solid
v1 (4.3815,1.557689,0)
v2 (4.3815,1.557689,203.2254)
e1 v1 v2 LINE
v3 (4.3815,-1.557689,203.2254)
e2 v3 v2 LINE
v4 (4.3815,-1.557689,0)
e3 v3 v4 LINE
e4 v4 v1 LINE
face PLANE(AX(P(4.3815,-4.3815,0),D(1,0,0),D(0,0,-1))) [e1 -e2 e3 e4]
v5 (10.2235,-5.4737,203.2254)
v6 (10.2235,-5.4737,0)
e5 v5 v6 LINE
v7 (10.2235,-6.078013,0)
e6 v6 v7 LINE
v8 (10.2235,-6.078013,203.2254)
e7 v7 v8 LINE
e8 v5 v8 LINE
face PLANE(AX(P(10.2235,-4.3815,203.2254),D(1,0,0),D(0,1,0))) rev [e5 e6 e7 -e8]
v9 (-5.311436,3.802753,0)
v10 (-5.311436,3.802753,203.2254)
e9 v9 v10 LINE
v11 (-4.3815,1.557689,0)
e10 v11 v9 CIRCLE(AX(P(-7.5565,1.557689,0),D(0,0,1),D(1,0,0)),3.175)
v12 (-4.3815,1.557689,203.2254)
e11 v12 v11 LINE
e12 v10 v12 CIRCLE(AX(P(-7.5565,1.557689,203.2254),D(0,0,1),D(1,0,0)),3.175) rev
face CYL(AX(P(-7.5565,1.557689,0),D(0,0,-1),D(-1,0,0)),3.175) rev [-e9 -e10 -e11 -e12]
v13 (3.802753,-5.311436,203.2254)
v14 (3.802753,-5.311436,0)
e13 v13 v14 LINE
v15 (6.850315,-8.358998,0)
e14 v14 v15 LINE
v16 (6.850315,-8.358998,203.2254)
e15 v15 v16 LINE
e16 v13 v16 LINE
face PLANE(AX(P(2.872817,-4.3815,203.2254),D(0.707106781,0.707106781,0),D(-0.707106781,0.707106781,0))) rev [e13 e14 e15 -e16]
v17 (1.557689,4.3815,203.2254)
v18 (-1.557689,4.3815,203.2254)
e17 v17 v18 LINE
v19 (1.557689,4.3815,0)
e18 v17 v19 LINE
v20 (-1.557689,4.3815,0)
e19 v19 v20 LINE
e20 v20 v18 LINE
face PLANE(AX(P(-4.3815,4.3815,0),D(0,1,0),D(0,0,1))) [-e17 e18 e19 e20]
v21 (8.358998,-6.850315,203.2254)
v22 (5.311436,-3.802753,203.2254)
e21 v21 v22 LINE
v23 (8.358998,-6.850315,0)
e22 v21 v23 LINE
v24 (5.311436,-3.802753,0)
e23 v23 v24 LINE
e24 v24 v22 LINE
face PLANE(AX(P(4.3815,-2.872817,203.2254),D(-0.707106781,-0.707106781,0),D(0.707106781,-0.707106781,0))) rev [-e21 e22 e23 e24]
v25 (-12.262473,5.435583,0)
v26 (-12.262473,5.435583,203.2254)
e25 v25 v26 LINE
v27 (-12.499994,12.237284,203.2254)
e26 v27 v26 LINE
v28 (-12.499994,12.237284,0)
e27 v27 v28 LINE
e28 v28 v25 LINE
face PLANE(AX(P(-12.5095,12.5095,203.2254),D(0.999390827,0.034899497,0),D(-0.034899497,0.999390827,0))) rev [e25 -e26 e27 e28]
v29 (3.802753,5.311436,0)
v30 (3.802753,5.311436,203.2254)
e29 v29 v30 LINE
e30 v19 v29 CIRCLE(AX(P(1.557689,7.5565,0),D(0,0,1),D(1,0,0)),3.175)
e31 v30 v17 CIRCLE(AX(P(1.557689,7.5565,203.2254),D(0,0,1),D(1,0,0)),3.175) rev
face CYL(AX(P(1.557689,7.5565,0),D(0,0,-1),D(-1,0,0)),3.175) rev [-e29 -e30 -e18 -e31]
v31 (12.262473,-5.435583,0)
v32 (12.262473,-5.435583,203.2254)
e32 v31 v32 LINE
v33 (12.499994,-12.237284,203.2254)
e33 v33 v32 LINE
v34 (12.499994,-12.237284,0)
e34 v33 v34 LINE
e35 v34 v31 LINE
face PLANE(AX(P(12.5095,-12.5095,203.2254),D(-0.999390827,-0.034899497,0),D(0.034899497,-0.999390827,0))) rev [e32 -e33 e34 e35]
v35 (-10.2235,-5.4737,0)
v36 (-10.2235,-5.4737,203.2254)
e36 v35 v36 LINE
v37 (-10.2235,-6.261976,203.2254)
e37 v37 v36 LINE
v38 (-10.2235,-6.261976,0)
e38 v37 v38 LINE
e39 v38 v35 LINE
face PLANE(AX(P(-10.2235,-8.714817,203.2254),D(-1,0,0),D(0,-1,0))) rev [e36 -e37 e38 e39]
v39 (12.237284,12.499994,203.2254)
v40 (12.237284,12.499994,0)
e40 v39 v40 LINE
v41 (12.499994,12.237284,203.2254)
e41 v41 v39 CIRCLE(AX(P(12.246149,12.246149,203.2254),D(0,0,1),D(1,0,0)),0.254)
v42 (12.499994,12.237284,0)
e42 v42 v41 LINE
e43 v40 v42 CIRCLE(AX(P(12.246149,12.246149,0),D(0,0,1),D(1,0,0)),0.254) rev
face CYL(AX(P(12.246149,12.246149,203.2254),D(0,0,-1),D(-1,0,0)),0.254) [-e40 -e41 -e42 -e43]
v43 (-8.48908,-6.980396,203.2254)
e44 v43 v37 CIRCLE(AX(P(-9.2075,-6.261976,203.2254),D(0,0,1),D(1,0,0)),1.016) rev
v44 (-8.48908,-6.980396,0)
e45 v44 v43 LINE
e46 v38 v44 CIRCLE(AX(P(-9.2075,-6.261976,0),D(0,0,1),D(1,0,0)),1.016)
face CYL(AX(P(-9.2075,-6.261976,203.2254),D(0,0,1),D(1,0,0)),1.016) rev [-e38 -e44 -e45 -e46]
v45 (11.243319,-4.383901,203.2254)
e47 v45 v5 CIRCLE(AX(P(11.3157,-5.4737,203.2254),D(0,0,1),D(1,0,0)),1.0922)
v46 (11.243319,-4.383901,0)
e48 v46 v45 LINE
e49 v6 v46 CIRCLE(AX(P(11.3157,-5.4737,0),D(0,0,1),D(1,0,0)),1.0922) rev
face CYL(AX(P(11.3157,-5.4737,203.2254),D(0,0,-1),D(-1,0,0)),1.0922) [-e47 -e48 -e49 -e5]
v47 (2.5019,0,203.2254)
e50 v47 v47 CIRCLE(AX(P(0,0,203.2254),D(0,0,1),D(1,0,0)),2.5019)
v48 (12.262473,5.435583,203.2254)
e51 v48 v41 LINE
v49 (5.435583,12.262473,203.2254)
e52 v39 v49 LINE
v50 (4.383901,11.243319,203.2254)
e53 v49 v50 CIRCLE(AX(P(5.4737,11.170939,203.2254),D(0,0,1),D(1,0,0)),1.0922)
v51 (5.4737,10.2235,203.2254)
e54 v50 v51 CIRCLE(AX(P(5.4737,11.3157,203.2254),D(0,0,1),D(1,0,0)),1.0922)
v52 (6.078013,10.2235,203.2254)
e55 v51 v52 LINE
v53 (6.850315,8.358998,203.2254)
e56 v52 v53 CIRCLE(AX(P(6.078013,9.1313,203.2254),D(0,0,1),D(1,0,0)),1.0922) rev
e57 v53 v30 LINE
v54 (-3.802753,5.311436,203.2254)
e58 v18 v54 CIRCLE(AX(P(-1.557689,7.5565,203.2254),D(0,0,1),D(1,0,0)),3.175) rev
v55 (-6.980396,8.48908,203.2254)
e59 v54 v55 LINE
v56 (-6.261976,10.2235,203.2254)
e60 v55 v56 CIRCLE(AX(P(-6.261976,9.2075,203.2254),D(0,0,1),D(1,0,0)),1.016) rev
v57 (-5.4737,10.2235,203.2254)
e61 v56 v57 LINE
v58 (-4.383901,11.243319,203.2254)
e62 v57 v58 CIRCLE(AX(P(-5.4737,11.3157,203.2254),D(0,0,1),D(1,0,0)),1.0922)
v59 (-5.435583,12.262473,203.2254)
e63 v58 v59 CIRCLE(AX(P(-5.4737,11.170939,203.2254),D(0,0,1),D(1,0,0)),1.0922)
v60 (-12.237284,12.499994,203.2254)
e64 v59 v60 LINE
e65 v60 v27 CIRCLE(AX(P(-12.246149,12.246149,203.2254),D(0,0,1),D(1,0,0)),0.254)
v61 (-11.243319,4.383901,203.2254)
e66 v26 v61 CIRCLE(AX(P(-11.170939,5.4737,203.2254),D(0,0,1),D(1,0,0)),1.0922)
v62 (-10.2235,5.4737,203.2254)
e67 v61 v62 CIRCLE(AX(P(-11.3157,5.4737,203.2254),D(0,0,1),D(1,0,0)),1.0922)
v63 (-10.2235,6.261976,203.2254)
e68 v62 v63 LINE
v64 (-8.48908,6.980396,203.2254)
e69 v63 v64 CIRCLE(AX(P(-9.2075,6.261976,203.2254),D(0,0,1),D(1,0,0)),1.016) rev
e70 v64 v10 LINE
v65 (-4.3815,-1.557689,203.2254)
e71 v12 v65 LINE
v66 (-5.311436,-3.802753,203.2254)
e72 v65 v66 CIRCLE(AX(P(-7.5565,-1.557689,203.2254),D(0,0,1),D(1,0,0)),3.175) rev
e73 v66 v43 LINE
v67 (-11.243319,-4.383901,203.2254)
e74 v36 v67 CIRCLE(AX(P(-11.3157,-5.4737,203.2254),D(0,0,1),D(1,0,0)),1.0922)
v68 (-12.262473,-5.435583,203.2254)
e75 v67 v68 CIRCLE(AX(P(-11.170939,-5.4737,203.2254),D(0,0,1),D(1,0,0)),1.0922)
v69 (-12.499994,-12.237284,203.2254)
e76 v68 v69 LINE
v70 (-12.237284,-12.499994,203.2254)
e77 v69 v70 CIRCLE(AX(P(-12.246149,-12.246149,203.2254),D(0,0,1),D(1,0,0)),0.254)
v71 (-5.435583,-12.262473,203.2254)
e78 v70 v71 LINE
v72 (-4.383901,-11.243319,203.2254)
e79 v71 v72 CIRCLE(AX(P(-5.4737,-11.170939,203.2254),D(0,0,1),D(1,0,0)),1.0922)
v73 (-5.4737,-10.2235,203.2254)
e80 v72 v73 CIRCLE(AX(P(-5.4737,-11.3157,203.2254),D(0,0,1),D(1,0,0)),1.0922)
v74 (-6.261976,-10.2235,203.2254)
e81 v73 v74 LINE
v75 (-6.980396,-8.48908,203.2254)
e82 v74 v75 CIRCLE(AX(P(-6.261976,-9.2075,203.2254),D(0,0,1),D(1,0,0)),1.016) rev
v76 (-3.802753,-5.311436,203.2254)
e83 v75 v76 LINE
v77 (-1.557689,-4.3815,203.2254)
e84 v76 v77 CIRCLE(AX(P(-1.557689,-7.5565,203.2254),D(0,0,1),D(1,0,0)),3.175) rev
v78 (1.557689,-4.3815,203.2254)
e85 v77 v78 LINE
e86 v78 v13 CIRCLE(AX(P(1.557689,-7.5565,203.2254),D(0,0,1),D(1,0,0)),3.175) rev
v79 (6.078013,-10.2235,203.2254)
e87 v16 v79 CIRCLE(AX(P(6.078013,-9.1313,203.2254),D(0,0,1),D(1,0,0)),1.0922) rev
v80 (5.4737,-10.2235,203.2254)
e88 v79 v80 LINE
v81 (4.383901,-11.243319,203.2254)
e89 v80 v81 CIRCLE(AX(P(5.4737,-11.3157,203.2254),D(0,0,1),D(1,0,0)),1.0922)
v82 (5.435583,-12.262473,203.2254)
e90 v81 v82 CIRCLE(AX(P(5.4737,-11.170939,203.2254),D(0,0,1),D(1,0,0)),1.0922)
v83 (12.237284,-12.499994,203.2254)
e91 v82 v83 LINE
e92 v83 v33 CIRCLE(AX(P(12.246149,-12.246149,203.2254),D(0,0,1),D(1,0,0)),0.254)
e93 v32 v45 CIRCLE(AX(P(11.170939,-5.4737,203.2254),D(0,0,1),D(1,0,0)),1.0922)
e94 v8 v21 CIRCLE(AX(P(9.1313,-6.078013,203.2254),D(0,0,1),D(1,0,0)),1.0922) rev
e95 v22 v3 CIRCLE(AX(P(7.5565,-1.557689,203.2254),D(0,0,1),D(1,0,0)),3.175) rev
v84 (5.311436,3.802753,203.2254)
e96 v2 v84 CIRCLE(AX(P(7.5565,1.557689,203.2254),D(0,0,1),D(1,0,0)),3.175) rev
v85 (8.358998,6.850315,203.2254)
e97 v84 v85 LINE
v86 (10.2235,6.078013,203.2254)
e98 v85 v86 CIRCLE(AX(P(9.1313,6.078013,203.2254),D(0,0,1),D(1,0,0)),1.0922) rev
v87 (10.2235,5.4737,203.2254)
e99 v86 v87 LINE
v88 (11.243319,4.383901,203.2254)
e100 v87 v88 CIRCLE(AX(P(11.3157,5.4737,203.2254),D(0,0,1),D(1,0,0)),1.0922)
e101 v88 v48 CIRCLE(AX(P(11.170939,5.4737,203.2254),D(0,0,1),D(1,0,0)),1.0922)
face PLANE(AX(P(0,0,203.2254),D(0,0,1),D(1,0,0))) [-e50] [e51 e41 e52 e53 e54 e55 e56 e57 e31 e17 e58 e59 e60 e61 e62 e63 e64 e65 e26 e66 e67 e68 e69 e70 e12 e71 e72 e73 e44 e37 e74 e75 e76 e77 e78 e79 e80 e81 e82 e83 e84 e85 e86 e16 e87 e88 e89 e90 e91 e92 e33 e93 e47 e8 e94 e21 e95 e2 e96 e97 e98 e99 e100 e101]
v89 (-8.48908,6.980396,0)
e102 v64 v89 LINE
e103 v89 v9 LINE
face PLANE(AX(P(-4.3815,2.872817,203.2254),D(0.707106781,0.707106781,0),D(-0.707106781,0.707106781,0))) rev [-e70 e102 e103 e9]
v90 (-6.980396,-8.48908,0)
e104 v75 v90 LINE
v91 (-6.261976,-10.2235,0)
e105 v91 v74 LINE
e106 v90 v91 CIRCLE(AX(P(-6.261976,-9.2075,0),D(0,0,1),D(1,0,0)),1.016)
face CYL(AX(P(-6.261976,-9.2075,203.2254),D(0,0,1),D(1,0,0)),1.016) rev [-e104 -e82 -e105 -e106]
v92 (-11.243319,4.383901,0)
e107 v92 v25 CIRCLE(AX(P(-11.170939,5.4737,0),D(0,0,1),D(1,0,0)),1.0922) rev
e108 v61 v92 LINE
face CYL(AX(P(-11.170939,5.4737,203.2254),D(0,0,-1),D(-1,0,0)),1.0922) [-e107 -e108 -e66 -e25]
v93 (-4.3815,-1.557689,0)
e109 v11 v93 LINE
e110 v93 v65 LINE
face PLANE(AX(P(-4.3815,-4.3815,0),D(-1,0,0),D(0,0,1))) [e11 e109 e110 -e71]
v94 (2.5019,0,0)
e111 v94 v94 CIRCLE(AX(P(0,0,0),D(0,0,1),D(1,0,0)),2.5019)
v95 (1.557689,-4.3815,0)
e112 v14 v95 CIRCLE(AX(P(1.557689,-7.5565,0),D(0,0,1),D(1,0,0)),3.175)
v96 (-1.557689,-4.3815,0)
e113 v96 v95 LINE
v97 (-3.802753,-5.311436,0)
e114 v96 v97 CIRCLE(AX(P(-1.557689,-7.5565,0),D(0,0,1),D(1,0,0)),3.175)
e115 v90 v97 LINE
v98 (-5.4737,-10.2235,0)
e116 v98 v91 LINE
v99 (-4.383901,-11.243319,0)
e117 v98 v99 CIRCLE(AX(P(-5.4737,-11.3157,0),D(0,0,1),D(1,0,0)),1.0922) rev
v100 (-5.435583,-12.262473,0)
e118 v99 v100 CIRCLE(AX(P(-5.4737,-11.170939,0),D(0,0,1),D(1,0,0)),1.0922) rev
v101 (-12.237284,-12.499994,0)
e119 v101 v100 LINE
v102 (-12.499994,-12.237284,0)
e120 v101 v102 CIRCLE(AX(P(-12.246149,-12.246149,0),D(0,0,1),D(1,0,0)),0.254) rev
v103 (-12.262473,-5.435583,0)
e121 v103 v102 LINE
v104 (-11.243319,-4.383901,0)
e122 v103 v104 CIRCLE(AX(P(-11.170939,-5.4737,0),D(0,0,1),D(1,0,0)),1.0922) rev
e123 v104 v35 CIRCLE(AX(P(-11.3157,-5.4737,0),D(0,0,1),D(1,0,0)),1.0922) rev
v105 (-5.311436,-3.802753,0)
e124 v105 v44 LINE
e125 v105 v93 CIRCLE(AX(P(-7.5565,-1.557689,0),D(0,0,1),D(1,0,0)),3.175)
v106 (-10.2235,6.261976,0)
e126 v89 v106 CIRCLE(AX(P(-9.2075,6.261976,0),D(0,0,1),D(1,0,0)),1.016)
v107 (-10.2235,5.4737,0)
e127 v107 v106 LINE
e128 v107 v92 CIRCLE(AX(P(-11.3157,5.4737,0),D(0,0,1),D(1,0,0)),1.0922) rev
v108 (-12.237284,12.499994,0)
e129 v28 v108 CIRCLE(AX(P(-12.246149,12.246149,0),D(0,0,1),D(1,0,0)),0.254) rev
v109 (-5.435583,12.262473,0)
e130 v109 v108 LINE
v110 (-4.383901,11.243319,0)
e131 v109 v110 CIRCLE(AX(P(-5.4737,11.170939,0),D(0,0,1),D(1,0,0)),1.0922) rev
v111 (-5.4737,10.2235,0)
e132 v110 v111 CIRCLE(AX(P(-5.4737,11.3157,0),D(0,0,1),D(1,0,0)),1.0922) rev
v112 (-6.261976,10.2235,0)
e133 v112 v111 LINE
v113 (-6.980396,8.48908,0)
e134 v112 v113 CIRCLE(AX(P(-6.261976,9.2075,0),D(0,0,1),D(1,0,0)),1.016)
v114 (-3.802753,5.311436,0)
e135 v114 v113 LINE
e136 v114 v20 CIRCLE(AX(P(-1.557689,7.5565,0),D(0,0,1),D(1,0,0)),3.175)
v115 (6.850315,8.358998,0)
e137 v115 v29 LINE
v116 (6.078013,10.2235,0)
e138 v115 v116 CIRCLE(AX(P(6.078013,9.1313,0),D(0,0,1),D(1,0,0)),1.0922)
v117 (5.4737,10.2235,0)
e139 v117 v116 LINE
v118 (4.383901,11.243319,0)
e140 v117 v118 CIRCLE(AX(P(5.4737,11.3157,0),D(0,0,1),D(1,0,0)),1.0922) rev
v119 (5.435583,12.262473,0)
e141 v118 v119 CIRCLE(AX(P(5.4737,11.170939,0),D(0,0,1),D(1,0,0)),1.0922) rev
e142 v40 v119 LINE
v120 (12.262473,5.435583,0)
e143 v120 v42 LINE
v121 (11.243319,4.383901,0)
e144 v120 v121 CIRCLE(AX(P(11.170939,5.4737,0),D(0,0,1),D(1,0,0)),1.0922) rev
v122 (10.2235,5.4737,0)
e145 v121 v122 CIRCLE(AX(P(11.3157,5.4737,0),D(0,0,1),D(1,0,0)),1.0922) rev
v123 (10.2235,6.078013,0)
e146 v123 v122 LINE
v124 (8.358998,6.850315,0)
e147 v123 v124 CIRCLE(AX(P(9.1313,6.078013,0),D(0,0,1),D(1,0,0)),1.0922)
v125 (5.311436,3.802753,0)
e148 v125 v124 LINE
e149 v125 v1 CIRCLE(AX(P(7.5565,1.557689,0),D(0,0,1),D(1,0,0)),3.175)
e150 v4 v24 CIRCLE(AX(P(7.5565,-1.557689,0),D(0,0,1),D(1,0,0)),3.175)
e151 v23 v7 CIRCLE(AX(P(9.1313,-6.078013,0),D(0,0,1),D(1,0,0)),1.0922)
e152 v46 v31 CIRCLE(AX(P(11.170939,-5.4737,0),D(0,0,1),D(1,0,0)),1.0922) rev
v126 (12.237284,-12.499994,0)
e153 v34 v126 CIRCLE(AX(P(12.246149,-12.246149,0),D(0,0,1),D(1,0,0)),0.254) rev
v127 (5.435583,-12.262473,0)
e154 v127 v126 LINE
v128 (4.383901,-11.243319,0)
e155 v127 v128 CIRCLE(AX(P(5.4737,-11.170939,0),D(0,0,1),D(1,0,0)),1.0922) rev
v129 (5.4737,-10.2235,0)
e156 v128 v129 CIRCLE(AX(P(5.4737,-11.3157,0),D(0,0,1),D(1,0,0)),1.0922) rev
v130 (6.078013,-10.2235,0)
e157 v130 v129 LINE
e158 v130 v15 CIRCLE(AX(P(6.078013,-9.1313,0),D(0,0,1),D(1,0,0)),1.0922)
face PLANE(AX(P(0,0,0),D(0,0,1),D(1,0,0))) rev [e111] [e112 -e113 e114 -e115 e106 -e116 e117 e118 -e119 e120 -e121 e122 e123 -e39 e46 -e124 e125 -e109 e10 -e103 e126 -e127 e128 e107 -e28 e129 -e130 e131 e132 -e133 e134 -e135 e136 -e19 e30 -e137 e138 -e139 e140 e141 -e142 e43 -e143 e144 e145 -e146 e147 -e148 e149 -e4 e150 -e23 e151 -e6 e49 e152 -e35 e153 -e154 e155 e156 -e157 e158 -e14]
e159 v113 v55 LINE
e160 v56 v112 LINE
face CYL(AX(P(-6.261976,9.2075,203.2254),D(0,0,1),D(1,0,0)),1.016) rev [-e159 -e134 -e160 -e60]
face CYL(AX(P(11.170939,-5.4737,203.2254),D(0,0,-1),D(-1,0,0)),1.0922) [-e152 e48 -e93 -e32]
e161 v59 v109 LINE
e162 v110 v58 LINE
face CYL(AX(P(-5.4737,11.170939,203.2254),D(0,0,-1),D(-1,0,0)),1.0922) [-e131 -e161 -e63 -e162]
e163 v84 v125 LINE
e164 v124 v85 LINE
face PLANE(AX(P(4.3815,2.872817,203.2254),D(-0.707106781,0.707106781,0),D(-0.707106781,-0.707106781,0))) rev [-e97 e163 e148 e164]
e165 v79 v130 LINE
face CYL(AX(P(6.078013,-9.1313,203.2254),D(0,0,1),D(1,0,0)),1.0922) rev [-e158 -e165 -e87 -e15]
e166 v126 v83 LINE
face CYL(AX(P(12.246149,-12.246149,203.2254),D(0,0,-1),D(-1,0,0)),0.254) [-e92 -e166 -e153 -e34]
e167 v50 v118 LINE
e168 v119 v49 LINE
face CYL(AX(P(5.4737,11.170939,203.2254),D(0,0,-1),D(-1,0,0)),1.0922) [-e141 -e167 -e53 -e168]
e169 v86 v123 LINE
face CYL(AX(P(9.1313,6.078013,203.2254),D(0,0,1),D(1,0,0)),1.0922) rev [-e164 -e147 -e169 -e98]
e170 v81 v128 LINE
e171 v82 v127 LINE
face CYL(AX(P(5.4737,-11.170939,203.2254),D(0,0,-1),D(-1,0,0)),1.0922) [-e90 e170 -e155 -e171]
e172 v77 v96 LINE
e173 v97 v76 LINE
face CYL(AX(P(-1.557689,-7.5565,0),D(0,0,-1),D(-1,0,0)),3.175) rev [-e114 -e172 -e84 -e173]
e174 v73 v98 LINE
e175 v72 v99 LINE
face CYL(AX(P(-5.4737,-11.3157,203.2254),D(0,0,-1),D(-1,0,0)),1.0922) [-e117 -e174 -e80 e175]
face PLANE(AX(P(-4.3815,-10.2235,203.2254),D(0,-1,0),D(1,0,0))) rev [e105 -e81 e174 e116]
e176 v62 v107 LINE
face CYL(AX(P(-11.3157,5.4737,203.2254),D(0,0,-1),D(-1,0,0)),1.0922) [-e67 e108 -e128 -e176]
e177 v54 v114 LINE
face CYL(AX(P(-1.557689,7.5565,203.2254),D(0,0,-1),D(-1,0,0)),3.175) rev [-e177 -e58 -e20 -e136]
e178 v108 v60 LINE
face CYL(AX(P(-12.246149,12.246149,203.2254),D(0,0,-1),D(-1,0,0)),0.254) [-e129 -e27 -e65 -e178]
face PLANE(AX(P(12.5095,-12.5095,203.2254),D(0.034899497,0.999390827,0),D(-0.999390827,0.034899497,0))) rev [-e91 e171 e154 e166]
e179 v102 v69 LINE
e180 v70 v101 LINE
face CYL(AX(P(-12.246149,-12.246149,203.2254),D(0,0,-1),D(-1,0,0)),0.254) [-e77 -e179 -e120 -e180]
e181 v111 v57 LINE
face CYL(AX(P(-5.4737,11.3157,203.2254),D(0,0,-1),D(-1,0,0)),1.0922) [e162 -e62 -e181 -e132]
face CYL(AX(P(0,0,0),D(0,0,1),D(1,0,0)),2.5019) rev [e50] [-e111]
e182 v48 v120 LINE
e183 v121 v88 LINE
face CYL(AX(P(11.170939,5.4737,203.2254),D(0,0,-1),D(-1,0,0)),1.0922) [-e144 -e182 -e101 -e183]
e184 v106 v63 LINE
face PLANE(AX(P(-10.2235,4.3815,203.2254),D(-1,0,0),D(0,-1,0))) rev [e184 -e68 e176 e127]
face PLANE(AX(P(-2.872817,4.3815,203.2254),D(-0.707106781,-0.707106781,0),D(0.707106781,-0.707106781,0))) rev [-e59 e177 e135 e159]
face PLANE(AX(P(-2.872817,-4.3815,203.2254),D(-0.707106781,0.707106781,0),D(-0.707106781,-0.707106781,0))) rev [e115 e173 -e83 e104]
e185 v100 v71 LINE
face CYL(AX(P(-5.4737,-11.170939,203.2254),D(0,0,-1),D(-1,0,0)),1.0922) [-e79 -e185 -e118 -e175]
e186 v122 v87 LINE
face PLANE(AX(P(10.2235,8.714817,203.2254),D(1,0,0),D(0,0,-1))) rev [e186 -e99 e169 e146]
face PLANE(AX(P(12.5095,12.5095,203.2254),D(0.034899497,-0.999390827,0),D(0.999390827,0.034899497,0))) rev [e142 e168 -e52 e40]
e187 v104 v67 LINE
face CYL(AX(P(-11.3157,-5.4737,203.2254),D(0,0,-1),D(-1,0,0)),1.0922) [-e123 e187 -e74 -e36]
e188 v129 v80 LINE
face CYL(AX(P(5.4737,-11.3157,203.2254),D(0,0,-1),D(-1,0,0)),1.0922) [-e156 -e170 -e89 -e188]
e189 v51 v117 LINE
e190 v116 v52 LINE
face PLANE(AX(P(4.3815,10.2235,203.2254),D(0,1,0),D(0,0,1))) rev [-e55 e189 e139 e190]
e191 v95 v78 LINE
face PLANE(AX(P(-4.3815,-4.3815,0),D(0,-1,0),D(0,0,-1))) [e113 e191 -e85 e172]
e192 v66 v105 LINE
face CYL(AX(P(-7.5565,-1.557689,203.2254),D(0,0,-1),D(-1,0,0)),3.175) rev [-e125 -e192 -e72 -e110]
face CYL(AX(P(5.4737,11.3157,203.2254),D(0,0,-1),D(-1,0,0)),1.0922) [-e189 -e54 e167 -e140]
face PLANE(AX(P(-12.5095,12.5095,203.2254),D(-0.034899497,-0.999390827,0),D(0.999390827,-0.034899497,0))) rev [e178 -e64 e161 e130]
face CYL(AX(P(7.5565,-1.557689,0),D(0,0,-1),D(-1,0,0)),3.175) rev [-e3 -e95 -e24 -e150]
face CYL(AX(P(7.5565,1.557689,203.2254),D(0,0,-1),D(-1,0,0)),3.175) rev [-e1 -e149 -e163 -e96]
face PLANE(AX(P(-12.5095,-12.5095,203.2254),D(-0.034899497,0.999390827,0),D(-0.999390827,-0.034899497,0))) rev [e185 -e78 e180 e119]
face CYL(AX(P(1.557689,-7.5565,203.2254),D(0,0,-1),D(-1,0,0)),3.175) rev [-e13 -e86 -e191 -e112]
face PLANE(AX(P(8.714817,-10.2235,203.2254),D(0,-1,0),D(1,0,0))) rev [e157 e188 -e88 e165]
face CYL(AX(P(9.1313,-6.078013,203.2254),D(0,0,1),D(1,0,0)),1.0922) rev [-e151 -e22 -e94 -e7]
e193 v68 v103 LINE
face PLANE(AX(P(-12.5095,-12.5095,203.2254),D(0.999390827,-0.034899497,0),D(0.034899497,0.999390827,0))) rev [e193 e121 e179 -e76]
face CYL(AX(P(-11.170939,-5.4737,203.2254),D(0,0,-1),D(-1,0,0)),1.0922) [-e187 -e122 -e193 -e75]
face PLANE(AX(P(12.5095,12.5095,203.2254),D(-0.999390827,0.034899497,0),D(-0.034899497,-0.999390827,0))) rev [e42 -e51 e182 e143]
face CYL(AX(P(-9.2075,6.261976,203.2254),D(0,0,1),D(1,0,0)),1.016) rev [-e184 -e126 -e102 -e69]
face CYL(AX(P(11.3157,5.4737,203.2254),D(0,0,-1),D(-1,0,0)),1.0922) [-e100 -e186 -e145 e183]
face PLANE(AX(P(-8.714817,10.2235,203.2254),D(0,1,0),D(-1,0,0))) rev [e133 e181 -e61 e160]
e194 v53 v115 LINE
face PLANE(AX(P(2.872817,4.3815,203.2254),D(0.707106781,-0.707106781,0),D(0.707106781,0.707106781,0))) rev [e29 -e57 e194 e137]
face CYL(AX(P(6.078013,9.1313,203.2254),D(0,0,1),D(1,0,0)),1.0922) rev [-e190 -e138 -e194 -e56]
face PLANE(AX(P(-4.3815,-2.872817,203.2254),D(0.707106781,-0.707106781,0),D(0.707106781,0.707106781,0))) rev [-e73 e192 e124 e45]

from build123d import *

# Parameters (mm, degrees)
BOSS_EXTRUDE1_DEPTH   = 203.2254
BOSS_EXTRUDE1_2_DEPTH = 203.2254
BOSS_EXTRUDE1_3_DEPTH = 203.2254
BOSS_EXTRUDE1_4_DEPTH = 203.2254
FILLET1_R             = 1.0922
FILLET2_R             = 1.0922
FILLET3_R             = 1.016
FILLET4_R             = 1.016
FILLET5_R             = 0.254
FILLET6_R             = 0.254
FILLET7_R             = 0.254
FILLET8_R             = 0.254
FILLET9_R             = 1.016
FILLET10_R            = 1.0922
FILLET11_R            = 1.0922
FILLET12_R            = 1.0922
FILLET13_R            = 1.0922
FILLET14_R            = 1.0922
SKETCH2_W             = 8.763
SKETCH2_H             = 8.763
SKETCH2_R             = 2.5019
BOSS_EXTRUDE2_DEPTH   = 203.2254
FILLET15_R            = 3.175


with BuildPart() as part:
    # Sketch1 → Boss-Extrude1 (new body)
    with BuildSketch(Plane.XY):
        Polygon((-8.714816972, 10.2235), (-4.3815, 10.2235), (-4.3815, 12.225663986), (-12.5095, 12.5095), (-12.225663986, 4.3815), (-10.2235, 4.3815), (-10.2235, 8.714816972), (-4.3815, 2.872816972), (-4.3815, 4.3815), (-2.872816972, 4.3815), align=None)
    extrude(amount=BOSS_EXTRUDE1_DEPTH)

    # Fillet1
    # the kernel refuses this fillet: 1.0922 mm, written as the material it takes off along each edge
    with BuildSketch(Plane(origin=(-4.3815, 10.2235, -2.7305), x_dir=(-1, 0, 0), z_dir=(0, 0, 1))) as fillet1_piece_1:
        with BuildLine():
            CenterArc((FILLET1_R, -FILLET1_R), FILLET1_R, 90, 90)
            Line((0, -FILLET1_R), (0, 0))
            Line((0, 0), (FILLET1_R, 0))
        make_face()
    extrude(amount=208.6864, mode=Mode.SUBTRACT)
    with BuildSketch(Plane(origin=(-4.3815, 12.225663986, -2.6368132), x_dir=(0, -1, 0), z_dir=(0, 0, 1))) as fillet1_piece_2:
        with BuildLine():
            CenterArc((FILLET1_R * 0.965688774807, -FILLET1_R), FILLET1_R, 90, 88)
            Line((-FILLET1_R * 0.033702052212, -FILLET1_R * 0.965100503298), (0, 0))
            Line((0, 0), (FILLET1_R * 0.965688774807, 0))
        make_face()
    extrude(amount=208.499026399, mode=Mode.SUBTRACT)

    # Fillet2
    # the kernel refuses this fillet: 1.0922 mm, written as the material it takes off along each edge
    with BuildSketch(Plane(origin=(-10.2235, 4.3815, -2.7305), x_dir=(0, 1, 0), z_dir=(0, 0, 1))) as fillet2_piece_1:
        with BuildLine():
            CenterArc((FILLET2_R, FILLET2_R), FILLET2_R, 180, 90)
            Line((0, FILLET2_R), (0, 0))
            Line((0, 0), (FILLET2_R, 0))
        make_face()
    extrude(amount=208.6864, mode=Mode.SUBTRACT)
    with BuildSketch(Plane(origin=(-12.225663986, 4.3815, -2.6368132), x_dir=(1, 0, 0), z_dir=(0, 0, 1))) as fillet2_piece_2:
        with BuildLine():
            CenterArc((FILLET2_R * 0.965688774807, FILLET2_R), FILLET2_R, 182, 88)
            Line((-FILLET2_R * 0.033702052212, FILLET2_R * 0.965100503298), (0, 0))
            Line((0, 0), (FILLET2_R * 0.965688774807, 0))
        make_face()
    extrude(amount=208.499026399, mode=Mode.SUBTRACT)

    # Fillet3
    fillet3_edges = [part.edges().sort_by_distance(p)[0] for p in [
        (-10.2235, 8.714816972, 101.6127),
    ]]
    fillet(fillet3_edges, radius=FILLET3_R)

    # Fillet4
    fillet4_edges = [part.edges().sort_by_distance(p)[0] for p in [
        (-8.714816972, 10.2235, 101.6127),
    ]]
    fillet(fillet4_edges, radius=FILLET4_R)

    # Fillet5
    fillet5_edges = [part.edges().sort_by_distance(p)[0] for p in [
        (-12.5095, 12.5095, 101.6127),
    ]]
    fillet(fillet5_edges, radius=FILLET5_R)



with BuildPart() as body_2:
    # Sketch1 → Boss-Extrude1 2 (new body)
    with BuildSketch(Plane.XY):
        Polygon((12.5095, 12.5095), (4.3815, 12.225663986), (4.3815, 10.2235), (8.714816972, 10.2235), (2.872816972, 4.3815), (4.3815, 4.3815), (4.3815, 2.872816972), (10.2235, 8.714816972), (10.2235, 4.3815), (12.225663986, 4.3815), align=None)
    extrude(amount=BOSS_EXTRUDE1_2_DEPTH)

    # Fillet7
    fillet7_edges = [body_2.edges().sort_by_distance(p)[0] for p in [
        (12.5095, 12.5095, 101.6127),
    ]]
    fillet(fillet7_edges, radius=FILLET7_R)

    # Fillet11
    # the kernel refuses this fillet: 1.0922 mm, written as the material it takes off along each edge
    with BuildSketch(Plane(origin=(4.3815, 10.2235, -2.7305), x_dir=(0, 1, 0), z_dir=(0, 0, 1))) as fillet11_piece_1:
        with BuildLine():
            CenterArc((FILLET11_R, -FILLET11_R), FILLET11_R, 90, 90)
            Line((0, -FILLET11_R), (0, 0))
            Line((0, 0), (FILLET11_R, 0))
        make_face()
    extrude(amount=208.6864, mode=Mode.SUBTRACT)
    with BuildSketch(Plane(origin=(4.3815, 12.225663986, -2.6368132), x_dir=(0.9993908270190961, 0.03489949670249208, 0), z_dir=(0, 0, 1))) as fillet11_piece_2:
        with BuildLine():
            CenterArc((FILLET11_R * 0.965688774807, -FILLET11_R), FILLET11_R, 90, 88)
            Line((-FILLET11_R * 0.033702052212, -FILLET11_R * 0.965100503298), (0, 0))
            Line((0, 0), (FILLET11_R * 0.965688774807, 0))
        make_face()
    extrude(amount=208.499026399, mode=Mode.SUBTRACT)
    with BuildSketch(Plane(origin=(10.2235, 4.3815, -2.7305), x_dir=(1, 0, 0), z_dir=(0, 0, 1))) as fillet11_piece_3:
        with BuildLine():
            CenterArc((FILLET11_R, FILLET11_R), FILLET11_R, 180, 90)
            Line((0, FILLET11_R), (0, 0))
            Line((0, 0), (FILLET11_R, 0))
        make_face()
    extrude(amount=208.6864, mode=Mode.SUBTRACT)
    with BuildSketch(Plane(origin=(12.225663986, 4.3815, -2.6368132), x_dir=(0.03489949670249721, 0.9993908270190958, 0), z_dir=(0, 0, 1))) as fillet11_piece_4:
        with BuildLine():
            CenterArc((FILLET11_R * 0.965688774807, FILLET11_R), FILLET11_R, 182, 88)
            Line((-FILLET11_R * 0.033702052212, FILLET11_R * 0.965100503298), (0, 0))
            Line((0, 0), (FILLET11_R * 0.965688774807, 0))
        make_face()
    extrude(amount=208.499026399, mode=Mode.SUBTRACT)

    # Fillet14
    fillet14_edges = [body_2.edges().sort_by_distance(p)[0] for p in [
        (10.2235, 8.714816972, 101.6127),
        (8.714816972, 10.2235, 101.6127),
    ]]
    fillet(fillet14_edges, radius=FILLET14_R)


with BuildPart() as body_3:
    # Sketch1 → Boss-Extrude1 3 (new body)
    with BuildSketch(Plane.XY):
        Polygon((12.5095, -12.5095), (12.225663986, -4.3815), (10.2235, -4.3815), (10.2235, -8.714816972), (4.3815, -2.872816972), (4.3815, -4.3815), (2.872816972, -4.3815), (8.714816972, -10.2235), (4.3815, -10.2235), (4.3815, -12.225663986), align=None)
    extrude(amount=BOSS_EXTRUDE1_3_DEPTH)

    # Fillet8
    fillet8_edges = [body_3.edges().sort_by_distance(p)[0] for p in [
        (12.5095, -12.5095, 101.6127),
    ]]
    fillet(fillet8_edges, radius=FILLET8_R)

    # Fillet12
    # the kernel refuses this fillet: 1.0922 mm, written as the material it takes off along each edge
    with BuildSketch(Plane(origin=(12.225663986, -4.3815, -2.6368132), x_dir=(0.03489949670249375, -0.999390827019096, 0), z_dir=(0, 0, 1))) as fillet12_piece_1:
        with BuildLine():
            CenterArc((FILLET12_R * 0.965688774807, -FILLET12_R), FILLET12_R, 90, 88)
            Line((-FILLET12_R * 0.033702052212, -FILLET12_R * 0.965100503298), (0, 0))
            Line((0, 0), (FILLET12_R * 0.965688774807, 0))
        make_face()
    extrude(amount=208.499026399, mode=Mode.SUBTRACT)
    with BuildSketch(Plane(origin=(10.2235, -4.3815, -2.7305), x_dir=(1, 0, 0), z_dir=(0, 0, 1))) as fillet12_piece_2:
        with BuildLine():
            CenterArc((FILLET12_R, -FILLET12_R), FILLET12_R, 90, 90)
            Line((0, -FILLET12_R), (0, 0))
            Line((0, 0), (FILLET12_R, 0))
        make_face()
    extrude(amount=208.6864, mode=Mode.SUBTRACT)
    with BuildSketch(Plane(origin=(4.3815, -12.225663986, -2.6368132), x_dir=(0.9993908270190958, -0.03489949670249721, 0), z_dir=(0, 0, 1))) as fillet12_piece_3:
        with BuildLine():
            CenterArc((FILLET12_R * 0.965688774807, FILLET12_R), FILLET12_R, 182, 88)
            Line((-FILLET12_R * 0.033702052212, FILLET12_R * 0.965100503298), (0, 0))
            Line((0, 0), (FILLET12_R * 0.965688774807, 0))
        make_face()
    extrude(amount=208.499026399, mode=Mode.SUBTRACT)
    with BuildSketch(Plane(origin=(4.3815, -10.2235, -2.7305), x_dir=(0, -1, 0), z_dir=(0, 0, 1))) as fillet12_piece_4:
        with BuildLine():
            CenterArc((FILLET12_R, FILLET12_R), FILLET12_R, 180, 90)
            Line((0, FILLET12_R), (0, 0))
            Line((0, 0), (FILLET12_R, 0))
        make_face()
    extrude(amount=208.6864, mode=Mode.SUBTRACT)

    # Fillet13
    fillet13_edges = [body_3.edges().sort_by_distance(p)[0] for p in [
        (8.714816972, -10.2235, 101.6127),
        (10.2235, -8.714816972, 101.6127),
    ]]
    fillet(fillet13_edges, radius=FILLET13_R)


with BuildPart() as body_4:
    # Sketch1 → Boss-Extrude1 4 (new body)
    with BuildSketch(Plane.XY):
        Polygon((-12.5095, -12.5095), (-4.3815, -12.225663986), (-4.3815, -10.2235), (-8.714816972, -10.2235), (-2.872816972, -4.3815), (-4.3815, -4.3815), (-4.3815, -2.872816972), (-10.2235, -8.714816972), (-10.2235, -4.3815), (-12.225663986, -4.3815), align=None)
    extrude(amount=BOSS_EXTRUDE1_4_DEPTH)

    # Fillet6
    fillet6_edges = [body_4.edges().sort_by_distance(p)[0] for p in [
        (-12.5095, -12.5095, 101.6127),
    ]]
    fillet(fillet6_edges, radius=FILLET6_R)

    # Fillet9
    fillet9_edges = [body_4.edges().sort_by_distance(p)[0] for p in [
        (-10.2235, -8.714816972, 101.6127),
        (-8.714816972, -10.2235, 101.6127),
    ]]
    fillet(fillet9_edges, radius=FILLET9_R)

    # Fillet10
    # the kernel refuses this fillet: 1.0922 mm, written as the material it takes off along each edge
    with BuildSketch(Plane(origin=(-4.3815, -10.2235, -2.7305), x_dir=(-1, 0, 0), z_dir=(0, 0, 1)), Plane(origin=(-10.2235, -4.3815, -2.7305), x_dir=(-1, 0, 0), z_dir=(0, 0, 1))) as fillet10_piece_1:
        with BuildLine():
            CenterArc((FILLET10_R, FILLET10_R), FILLET10_R, 180, 90)
            Line((0, FILLET10_R), (0, 0))
            Line((0, 0), (FILLET10_R, 0))
        make_face()
    extrude(amount=208.6864, mode=Mode.SUBTRACT)
    with BuildSketch(Plane(origin=(-4.3815, -12.225663986, -2.6368132), x_dir=(0, 1, 0), z_dir=(0, 0, 1)), Plane(origin=(-12.225663986, -4.3815, -2.6368132), x_dir=(-0.03489949670249721, -0.9993908270190958, 0), z_dir=(0, 0, 1))) as fillet10_piece_2:
        with BuildLine():
            CenterArc((FILLET10_R * 0.965688774807, FILLET10_R), FILLET10_R, 182, 88)
            Line((-FILLET10_R * 0.033702052212, FILLET10_R * 0.965100503298), (0, 0))
            Line((0, 0), (FILLET10_R * 0.965688774807, 0))
        make_face()
    extrude(amount=208.499026399, mode=Mode.SUBTRACT)


with BuildPart() as part_1:
    add(part.part)

    add(body_2.part)  # Boss-Extrude2 merges body 2

    add(body_3.part)  # Boss-Extrude2 merges body 3

    add(body_4.part)  # Boss-Extrude2 merges body 4
    # Sketch2 → Boss-Extrude2 (add)
    with BuildSketch(Plane.XY.offset(203.2254)):
        Rectangle(SKETCH2_W, SKETCH2_H)
        Circle(SKETCH2_R, mode=Mode.SUBTRACT)
    extrude(amount=-BOSS_EXTRUDE2_DEPTH)

    # Fillet15
    fillet15_edges = [part_1.edges().sort_by_distance(p)[0] for p in [
        (4.3815, -2.872816972, 101.6127),
        (2.872816972, -4.3815, 101.6127),
        (-2.872816972, -4.3815, 101.6127),
        (-4.3815, -2.872816972, 101.6127),
        (-2.872816972, 4.3815, 101.6127),
        (-4.3815, 2.872816972, 101.6127),
        (2.872816972, 4.3815, 101.6127),
        (4.3815, 2.872816972, 101.6127),
    ]]
    fillet(fillet15_edges, radius=FILLET15_R)


solid = part_1.part
